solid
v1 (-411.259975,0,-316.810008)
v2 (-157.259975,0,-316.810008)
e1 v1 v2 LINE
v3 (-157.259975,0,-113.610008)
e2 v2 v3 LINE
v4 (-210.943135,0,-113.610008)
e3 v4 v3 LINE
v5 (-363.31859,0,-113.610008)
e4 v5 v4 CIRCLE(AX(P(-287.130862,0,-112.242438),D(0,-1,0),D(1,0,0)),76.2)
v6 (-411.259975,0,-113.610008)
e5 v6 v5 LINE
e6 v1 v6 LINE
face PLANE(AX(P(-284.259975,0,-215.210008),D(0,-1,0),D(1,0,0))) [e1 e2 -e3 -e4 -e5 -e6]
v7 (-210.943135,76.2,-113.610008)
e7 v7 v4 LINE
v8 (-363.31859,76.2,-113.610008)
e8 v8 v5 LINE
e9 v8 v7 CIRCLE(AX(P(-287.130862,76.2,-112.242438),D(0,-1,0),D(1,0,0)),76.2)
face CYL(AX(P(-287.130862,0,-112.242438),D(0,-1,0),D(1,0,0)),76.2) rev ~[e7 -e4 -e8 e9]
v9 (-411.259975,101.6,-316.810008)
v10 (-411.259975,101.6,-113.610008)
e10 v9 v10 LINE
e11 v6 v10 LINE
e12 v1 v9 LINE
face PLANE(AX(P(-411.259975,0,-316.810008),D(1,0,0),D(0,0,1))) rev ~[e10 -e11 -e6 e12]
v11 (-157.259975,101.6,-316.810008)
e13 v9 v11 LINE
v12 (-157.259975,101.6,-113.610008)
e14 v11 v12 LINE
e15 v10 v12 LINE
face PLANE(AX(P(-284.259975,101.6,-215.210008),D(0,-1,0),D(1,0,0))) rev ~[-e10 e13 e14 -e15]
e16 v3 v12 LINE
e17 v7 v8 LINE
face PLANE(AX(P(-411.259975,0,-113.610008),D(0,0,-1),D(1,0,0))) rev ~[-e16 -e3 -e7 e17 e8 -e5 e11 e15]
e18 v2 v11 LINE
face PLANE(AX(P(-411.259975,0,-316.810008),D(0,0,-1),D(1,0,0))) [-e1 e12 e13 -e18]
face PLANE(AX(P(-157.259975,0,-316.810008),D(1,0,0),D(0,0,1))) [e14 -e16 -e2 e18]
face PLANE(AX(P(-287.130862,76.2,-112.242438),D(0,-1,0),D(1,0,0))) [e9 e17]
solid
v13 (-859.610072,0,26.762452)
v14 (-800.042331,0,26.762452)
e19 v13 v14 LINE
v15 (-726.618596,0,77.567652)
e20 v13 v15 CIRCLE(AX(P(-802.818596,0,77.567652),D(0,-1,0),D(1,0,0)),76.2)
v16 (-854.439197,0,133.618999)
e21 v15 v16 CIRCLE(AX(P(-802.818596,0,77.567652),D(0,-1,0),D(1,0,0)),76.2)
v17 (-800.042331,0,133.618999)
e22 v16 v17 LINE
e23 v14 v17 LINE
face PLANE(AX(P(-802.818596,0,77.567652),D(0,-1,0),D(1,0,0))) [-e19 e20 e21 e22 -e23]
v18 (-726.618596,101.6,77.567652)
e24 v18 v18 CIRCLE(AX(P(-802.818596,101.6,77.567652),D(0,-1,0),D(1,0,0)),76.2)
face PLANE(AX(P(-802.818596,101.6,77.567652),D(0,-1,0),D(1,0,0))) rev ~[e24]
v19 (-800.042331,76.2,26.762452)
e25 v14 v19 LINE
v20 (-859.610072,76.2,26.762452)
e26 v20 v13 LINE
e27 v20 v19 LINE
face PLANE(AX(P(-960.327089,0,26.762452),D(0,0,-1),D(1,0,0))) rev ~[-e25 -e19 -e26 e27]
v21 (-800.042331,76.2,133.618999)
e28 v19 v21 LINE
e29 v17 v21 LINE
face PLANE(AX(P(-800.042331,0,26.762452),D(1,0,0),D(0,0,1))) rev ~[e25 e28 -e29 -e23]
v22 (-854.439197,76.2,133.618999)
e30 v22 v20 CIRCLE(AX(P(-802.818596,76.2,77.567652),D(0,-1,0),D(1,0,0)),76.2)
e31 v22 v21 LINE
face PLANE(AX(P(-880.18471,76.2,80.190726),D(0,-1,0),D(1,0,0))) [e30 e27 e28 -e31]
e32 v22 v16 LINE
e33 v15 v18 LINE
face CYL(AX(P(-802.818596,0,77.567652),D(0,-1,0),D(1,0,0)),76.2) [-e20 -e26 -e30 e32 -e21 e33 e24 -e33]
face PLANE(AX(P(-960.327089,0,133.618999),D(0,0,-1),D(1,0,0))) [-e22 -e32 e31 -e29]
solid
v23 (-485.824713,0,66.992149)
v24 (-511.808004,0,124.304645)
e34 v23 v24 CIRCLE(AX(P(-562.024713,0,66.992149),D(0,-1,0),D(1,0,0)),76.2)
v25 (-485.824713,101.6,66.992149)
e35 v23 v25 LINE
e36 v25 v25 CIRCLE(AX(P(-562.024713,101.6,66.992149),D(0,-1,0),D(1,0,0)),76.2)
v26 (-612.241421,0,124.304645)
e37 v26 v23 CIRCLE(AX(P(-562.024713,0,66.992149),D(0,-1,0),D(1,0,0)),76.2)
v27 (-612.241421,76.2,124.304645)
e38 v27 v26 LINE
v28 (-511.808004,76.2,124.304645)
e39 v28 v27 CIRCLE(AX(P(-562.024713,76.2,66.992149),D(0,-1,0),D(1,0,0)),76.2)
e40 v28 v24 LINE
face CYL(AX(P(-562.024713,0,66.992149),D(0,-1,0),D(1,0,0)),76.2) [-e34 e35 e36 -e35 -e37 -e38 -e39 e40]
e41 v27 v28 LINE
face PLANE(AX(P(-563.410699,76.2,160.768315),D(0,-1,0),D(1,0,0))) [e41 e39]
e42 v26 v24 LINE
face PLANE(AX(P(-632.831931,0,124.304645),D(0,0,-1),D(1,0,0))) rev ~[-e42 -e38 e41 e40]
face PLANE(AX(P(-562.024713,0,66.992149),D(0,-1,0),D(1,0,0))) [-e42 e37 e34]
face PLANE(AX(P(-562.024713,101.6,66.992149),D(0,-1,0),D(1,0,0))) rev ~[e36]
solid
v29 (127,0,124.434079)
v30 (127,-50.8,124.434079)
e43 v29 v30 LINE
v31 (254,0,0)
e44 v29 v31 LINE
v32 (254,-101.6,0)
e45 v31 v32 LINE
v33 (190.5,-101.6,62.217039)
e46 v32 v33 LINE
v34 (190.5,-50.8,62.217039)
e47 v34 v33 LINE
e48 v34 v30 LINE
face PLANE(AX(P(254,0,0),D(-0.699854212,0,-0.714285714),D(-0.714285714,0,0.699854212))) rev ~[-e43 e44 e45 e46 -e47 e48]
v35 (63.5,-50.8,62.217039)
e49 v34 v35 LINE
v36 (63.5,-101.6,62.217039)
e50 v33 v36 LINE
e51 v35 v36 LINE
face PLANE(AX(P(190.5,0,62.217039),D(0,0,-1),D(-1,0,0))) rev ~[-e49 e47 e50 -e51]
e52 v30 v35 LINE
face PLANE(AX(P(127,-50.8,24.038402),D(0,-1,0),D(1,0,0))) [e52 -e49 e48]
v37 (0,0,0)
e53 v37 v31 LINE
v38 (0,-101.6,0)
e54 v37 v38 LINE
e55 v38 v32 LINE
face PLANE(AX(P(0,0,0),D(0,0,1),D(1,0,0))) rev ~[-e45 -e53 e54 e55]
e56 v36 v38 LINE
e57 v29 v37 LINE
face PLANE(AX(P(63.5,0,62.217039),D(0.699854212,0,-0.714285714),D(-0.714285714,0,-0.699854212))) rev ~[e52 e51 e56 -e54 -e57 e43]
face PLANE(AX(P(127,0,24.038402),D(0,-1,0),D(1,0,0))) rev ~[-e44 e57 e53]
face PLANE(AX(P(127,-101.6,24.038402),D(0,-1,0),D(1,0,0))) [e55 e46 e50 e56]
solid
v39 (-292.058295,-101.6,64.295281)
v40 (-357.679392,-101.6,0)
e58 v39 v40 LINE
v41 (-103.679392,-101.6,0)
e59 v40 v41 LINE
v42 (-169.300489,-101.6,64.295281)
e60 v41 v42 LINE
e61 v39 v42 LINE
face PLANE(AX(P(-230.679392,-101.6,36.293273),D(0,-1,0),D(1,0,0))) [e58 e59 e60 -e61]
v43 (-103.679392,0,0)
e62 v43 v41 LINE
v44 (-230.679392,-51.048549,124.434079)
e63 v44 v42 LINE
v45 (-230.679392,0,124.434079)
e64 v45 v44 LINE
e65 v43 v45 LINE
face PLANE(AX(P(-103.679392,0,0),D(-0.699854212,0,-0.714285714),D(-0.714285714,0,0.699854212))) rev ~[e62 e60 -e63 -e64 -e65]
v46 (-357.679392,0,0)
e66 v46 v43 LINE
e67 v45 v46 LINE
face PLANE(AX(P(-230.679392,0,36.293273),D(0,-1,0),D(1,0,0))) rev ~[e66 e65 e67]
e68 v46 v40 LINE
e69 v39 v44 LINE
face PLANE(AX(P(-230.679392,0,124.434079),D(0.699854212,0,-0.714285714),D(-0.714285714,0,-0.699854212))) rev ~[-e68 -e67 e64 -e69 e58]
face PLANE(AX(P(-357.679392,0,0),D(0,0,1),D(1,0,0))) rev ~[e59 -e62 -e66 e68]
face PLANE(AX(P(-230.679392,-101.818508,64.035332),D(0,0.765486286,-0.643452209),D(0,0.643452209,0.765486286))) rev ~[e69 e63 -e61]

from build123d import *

# Parameters (mm, degrees)
F1_DEPTH  = 101.6
F2_DEPTH  = 50.8
F4_DEPTH  = 101.6
F8_DEPTH  = 63.5
F9_R      = 76.2
F10_DEPTH = 101.6
F11_W     = 138.8424634933
F11_H     = 72.9273408651
F12_DEPTH = 76.2
F13_R     = 76.2
F14_DEPTH = 101.6
F15_W     = 160.2847576141
F15_H     = 106.856547296
F16_DEPTH = 76.2
F17_W     = 254
F17_H     = 203.2
F18_DEPTH = 101.6
F19_R     = 76.2
F20_DEPTH = 76.2


with BuildPart() as f1:
    # F0 (on Front) → F1 (new body)
    with BuildSketch(Plane.XZ):
        Polygon((63.5, 62.2170394667), (0, 0), (254, 0), (190.5, 62.2170394667), align=None)
    extrude(amount=F1_DEPTH)

    # F0 (on Front) → F2 (join)
    with BuildSketch(Plane.XZ):
        Polygon((63.5, 62.2170394667), (0, 0), (254, 0), (190.5, 62.2170394667), align=None)
        Polygon((127, 124.4340789334), (63.5, 62.2170394667), (190.5, 62.2170394667), align=None)
    extrude(amount=F2_DEPTH)


with BuildPart() as f4:
    # F3 (on Front) → F4 (new body)
    with BuildSketch(Plane.XZ):
        Polygon((-357.6793918375, 0), (-103.6793918375, 0), (-230.6793918375, 124.4340789334), align=None)
    extrude(amount=F4_DEPTH)

    # F7 (on 3pt) → F8 (cut, symmetric)
    with BuildSketch(Plane.YZ.offset(-230.6793918375)):
        Polygon((-101.8185078442, 64.035332354), (-51.0185078442, 124.4698180237), (-101.8185078442, 124.4698180237), align=None)
    extrude(amount=F8_DEPTH, both=True, mode=Mode.SUBTRACT)


with BuildPart() as f10:
    # F9 (on Front) → F10 (new body)
    with BuildSketch(Plane.XZ):
        with Locations((-562.0247125626, 66.992148757)):
            Circle(F9_R)
    extrude(amount=-F10_DEPTH)

    # F11 (on Front) → F12 (cut)
    with BuildSketch(Plane.XZ):
        with Locations((-563.4106993675, 160.768315196)):
            Rectangle(F11_W, F11_H)
    extrude(amount=-F12_DEPTH, mode=Mode.SUBTRACT)


with BuildPart() as f14:
    # F13 (on Front) → F14 (new body)
    with BuildSketch(Plane.XZ):
        with Locations((-802.8185963631, 77.5676518679)):
            Circle(F13_R)
    extrude(amount=-F14_DEPTH)

    # F15 (on Front) → F16 (cut)
    with BuildSketch(Plane.XZ):
        with Locations((-880.1847100258, 80.1907256246)):
            Rectangle(F15_W, F15_H)
    extrude(amount=-F16_DEPTH, mode=Mode.SUBTRACT)


with BuildPart() as f18:
    # F17 (on Front) → F18 (new body)
    with BuildSketch(Plane.XZ):
        with Locations((-284.2599749565, -215.2100077792)):
            Rectangle(F17_W, F17_H)
    extrude(amount=-F18_DEPTH)

    # F19 (on Front) → F20 (cut)
    with BuildSketch(Plane.XZ):
        with Locations((-287.1308624744, -112.2424378991)):
            Circle(F19_R)
    extrude(amount=-F20_DEPTH, mode=Mode.SUBTRACT)


solid = Compound([f1.part, f4.part, f10.part, f14.part, f18.part])
